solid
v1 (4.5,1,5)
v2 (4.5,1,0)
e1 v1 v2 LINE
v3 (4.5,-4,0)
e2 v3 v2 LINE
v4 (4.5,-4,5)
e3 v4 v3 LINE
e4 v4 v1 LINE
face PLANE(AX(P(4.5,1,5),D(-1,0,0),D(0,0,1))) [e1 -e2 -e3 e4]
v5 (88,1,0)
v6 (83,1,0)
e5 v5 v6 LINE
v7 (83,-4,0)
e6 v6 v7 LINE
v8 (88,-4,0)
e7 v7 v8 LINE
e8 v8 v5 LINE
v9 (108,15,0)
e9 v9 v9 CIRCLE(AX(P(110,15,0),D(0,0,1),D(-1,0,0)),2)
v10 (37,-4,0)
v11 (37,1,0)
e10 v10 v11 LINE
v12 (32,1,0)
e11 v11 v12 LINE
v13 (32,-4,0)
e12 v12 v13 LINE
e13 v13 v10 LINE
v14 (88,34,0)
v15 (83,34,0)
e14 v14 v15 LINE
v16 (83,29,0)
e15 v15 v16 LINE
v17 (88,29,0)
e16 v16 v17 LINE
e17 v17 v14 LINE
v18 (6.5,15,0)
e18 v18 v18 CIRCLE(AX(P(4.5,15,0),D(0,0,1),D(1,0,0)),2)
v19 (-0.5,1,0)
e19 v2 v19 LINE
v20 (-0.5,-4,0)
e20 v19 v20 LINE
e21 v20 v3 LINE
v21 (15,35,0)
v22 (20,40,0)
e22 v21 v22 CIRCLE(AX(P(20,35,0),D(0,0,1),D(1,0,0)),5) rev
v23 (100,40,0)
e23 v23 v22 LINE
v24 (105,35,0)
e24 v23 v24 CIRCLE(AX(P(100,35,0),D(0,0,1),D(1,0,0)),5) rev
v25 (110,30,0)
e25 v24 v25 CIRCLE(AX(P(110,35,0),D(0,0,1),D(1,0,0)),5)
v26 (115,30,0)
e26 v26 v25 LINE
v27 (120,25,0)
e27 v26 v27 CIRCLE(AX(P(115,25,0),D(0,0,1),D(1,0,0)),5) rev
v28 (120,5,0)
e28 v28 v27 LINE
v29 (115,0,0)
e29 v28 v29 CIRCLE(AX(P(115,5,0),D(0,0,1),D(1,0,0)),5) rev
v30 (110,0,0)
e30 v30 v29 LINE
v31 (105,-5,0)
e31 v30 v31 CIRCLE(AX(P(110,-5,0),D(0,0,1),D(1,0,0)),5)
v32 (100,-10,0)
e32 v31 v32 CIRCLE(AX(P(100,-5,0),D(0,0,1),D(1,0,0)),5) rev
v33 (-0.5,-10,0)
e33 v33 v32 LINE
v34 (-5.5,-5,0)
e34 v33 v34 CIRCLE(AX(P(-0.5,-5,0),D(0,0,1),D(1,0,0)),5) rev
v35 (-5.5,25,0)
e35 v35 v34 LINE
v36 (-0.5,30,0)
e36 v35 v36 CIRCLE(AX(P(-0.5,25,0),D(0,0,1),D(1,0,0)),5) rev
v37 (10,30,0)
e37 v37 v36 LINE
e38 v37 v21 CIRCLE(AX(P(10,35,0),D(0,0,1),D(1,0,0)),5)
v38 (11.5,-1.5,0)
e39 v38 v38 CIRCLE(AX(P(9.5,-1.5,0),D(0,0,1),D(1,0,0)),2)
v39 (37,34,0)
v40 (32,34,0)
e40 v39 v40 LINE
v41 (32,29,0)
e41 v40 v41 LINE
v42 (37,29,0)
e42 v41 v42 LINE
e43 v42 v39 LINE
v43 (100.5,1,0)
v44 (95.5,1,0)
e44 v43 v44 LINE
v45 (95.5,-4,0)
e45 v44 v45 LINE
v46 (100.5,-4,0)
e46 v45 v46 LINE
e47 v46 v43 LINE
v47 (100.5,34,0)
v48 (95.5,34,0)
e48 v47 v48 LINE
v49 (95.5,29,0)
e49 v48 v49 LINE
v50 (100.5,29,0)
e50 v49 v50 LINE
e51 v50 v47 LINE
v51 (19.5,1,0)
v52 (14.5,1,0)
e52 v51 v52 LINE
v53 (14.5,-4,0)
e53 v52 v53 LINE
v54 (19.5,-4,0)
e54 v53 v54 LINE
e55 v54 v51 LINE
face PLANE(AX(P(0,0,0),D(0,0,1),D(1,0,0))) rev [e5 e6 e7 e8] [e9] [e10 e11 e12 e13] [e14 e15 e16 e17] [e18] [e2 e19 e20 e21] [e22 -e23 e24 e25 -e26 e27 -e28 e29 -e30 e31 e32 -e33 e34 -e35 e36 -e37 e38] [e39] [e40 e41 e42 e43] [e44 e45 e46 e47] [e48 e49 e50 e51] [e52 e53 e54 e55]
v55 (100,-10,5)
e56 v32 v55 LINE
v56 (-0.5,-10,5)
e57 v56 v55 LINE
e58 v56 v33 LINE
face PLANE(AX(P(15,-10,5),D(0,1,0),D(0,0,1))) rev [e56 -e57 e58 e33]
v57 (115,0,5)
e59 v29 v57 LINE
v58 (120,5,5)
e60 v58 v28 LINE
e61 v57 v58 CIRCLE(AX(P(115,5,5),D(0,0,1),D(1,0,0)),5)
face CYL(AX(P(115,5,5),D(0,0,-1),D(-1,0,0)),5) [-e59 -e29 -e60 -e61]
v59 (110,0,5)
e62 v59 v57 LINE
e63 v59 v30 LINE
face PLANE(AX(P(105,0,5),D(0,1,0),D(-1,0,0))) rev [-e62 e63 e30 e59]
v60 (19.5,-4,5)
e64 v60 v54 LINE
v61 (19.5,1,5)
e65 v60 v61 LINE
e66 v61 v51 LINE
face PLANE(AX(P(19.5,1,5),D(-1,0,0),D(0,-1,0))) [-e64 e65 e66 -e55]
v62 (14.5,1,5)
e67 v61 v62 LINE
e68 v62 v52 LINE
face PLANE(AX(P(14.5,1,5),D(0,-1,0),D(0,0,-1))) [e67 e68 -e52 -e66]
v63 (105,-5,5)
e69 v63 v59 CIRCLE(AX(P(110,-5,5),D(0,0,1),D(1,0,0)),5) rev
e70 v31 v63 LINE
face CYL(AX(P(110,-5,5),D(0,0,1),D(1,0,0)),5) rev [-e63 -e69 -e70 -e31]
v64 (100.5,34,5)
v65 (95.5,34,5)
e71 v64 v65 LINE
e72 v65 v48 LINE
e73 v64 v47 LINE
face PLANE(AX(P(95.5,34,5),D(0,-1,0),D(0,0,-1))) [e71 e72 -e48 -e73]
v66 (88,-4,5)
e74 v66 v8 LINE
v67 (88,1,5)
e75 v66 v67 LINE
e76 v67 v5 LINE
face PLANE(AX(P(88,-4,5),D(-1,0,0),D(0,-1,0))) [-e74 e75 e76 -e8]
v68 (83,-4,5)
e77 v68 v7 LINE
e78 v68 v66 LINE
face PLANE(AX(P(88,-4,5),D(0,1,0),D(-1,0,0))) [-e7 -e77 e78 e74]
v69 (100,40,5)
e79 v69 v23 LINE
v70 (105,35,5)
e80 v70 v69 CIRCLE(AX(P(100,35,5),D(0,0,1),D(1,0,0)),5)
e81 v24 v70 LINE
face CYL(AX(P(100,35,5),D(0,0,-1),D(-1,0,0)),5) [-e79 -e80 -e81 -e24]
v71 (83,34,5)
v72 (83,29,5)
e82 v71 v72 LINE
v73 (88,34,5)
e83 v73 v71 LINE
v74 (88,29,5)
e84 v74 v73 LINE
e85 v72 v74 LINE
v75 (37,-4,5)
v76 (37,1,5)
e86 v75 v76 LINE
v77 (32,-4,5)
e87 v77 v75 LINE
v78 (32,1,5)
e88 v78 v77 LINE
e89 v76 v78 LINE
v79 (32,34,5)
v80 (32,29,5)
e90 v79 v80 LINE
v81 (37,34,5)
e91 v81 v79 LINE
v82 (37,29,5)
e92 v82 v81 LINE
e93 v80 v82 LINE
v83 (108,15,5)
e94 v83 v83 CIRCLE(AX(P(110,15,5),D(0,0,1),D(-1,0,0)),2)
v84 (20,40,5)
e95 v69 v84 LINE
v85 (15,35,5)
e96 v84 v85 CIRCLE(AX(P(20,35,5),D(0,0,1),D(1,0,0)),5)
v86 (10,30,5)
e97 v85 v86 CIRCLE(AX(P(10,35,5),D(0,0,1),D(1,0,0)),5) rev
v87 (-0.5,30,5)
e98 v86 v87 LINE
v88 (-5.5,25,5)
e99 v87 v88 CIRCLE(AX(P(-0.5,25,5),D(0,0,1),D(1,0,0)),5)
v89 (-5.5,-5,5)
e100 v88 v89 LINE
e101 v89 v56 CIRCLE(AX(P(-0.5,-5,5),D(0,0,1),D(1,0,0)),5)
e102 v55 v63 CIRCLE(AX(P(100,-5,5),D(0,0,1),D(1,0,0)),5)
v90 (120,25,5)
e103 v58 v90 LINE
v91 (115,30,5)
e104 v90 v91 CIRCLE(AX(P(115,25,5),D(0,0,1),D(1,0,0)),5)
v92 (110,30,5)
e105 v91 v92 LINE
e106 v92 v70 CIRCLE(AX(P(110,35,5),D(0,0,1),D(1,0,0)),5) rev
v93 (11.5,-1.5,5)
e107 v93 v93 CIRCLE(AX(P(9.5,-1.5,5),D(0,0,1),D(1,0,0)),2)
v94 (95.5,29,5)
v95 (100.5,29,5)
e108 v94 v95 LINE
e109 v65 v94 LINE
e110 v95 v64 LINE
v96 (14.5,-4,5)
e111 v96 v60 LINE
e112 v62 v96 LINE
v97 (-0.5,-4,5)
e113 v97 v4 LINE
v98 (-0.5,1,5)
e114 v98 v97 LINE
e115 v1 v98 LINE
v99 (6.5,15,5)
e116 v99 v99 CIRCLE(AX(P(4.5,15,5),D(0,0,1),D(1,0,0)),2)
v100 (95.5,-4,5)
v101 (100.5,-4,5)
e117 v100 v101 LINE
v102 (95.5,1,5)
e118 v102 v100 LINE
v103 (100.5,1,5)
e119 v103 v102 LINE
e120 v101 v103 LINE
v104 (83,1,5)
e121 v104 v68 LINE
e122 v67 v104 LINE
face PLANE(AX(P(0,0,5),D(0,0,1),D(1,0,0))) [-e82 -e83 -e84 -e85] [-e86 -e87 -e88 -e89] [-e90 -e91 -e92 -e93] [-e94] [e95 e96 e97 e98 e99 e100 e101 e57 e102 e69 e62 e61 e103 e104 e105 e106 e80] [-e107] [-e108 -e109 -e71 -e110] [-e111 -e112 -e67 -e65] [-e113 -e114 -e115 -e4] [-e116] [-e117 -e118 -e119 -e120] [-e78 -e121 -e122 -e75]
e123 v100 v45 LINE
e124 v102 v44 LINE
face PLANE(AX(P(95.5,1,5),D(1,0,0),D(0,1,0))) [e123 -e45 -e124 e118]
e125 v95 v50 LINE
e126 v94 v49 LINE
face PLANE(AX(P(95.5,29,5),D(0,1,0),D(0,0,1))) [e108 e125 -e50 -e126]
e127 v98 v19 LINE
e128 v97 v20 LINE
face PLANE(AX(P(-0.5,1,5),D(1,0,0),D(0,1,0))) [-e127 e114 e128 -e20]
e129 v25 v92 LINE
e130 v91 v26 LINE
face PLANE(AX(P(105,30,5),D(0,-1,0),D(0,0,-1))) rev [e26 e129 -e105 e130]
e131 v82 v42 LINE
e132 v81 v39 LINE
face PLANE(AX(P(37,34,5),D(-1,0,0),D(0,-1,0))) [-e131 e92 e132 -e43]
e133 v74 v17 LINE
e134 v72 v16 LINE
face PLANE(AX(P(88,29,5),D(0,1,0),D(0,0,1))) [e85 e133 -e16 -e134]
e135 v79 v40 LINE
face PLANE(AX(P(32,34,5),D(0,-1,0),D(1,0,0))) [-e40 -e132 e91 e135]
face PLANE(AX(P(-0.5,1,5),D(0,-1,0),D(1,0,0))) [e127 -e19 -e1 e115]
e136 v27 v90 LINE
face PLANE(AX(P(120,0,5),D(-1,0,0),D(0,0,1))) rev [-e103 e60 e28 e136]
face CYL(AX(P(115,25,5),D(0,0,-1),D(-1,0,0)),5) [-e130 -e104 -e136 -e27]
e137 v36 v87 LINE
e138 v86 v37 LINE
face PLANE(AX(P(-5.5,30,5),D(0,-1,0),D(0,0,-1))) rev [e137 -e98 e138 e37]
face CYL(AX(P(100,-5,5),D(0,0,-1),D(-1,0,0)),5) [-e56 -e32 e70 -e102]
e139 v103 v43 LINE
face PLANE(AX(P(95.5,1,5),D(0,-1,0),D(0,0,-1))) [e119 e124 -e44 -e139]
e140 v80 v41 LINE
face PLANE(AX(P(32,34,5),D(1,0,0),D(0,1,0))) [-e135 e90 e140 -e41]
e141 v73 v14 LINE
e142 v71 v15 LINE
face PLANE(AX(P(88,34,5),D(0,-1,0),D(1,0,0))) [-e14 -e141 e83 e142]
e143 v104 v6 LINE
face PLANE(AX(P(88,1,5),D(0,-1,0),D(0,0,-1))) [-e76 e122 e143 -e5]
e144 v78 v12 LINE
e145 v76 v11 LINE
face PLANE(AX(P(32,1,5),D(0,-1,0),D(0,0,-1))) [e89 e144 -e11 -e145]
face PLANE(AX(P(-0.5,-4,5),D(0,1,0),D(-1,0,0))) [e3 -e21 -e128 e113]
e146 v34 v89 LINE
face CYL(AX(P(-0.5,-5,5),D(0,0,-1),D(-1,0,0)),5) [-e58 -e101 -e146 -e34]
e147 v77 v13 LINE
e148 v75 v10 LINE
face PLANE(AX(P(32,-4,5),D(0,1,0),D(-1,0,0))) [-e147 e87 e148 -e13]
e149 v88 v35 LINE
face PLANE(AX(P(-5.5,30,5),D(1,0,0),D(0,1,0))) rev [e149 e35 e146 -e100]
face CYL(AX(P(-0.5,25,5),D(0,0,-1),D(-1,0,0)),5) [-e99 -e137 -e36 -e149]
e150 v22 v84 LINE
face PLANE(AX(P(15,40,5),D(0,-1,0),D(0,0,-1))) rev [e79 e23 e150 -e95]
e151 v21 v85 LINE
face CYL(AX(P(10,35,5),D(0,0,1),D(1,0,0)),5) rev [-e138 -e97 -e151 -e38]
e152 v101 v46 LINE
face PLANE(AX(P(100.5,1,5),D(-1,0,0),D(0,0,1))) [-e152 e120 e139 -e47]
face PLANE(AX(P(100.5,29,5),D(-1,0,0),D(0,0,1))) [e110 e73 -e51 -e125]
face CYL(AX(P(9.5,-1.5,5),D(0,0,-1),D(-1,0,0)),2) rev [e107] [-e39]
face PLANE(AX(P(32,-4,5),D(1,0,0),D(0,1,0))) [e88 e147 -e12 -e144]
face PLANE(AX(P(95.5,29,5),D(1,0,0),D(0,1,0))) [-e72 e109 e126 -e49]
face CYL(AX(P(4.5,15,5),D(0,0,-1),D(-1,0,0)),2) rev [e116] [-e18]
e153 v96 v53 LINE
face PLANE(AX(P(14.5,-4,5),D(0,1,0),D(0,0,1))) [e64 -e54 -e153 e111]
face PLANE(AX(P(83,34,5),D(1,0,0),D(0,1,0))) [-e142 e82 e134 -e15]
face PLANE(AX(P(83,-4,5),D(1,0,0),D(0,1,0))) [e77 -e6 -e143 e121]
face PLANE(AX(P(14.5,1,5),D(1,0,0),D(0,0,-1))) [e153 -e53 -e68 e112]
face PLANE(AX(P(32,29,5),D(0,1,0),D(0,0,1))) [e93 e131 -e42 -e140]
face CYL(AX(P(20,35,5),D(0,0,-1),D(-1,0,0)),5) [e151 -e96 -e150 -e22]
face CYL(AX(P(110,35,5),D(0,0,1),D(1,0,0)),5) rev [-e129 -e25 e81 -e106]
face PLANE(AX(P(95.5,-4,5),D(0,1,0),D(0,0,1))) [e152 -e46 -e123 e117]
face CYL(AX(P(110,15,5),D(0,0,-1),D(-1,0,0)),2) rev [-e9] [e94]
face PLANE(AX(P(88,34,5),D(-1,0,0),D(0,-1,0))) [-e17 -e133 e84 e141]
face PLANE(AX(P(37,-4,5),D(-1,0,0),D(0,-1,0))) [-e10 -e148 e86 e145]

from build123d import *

# Parameters (mm, degrees)
ESQUISSE1_R        = 2
ESQUISSE1_W        = 5
ESQUISSE1_H        = 5
BOSS_EXTRU_1_DEPTH = 5
CONG_1_R           = 5


with BuildPart() as part:
    # Esquisse1 → Boss.-Extru.1 (new body)
    with BuildSketch(Plane.XY):
        Polygon((15, 30), (15, 40), (105, 40), (105, 30), (120, 30), (120, 0), (105, 0), (105, -10), (15, -10), (-5.5, -10), (-5.5, 30), (0, 30), align=None)
        with Locations(Location((110, 15, 0), (0, 0, 180))):
            Circle(ESQUISSE1_R, mode=Mode.SUBTRACT)
        with Locations((4.5, 15)):
            Circle(ESQUISSE1_R, mode=Mode.SUBTRACT)
        with Locations((9.5, -1.5)):
            Circle(ESQUISSE1_R, mode=Mode.SUBTRACT)
        with Locations((85.5, 31.5)):
            Rectangle(ESQUISSE1_W, ESQUISSE1_H, mode=Mode.SUBTRACT)
        with Locations((34.5, 31.5)):
            Rectangle(ESQUISSE1_W, ESQUISSE1_H, mode=Mode.SUBTRACT)
        with Locations((85.5, -1.5)):
            Rectangle(ESQUISSE1_W, ESQUISSE1_H, mode=Mode.SUBTRACT)
        with Locations((34.5, -1.5)):
            Rectangle(ESQUISSE1_W, ESQUISSE1_H, mode=Mode.SUBTRACT)
        with Locations((98, -1.5)):
            Rectangle(ESQUISSE1_W, ESQUISSE1_H, mode=Mode.SUBTRACT)
        with Locations((98, 31.5)):
            Rectangle(ESQUISSE1_W, ESQUISSE1_H, mode=Mode.SUBTRACT)
        with Locations((2, -1.5)):
            Rectangle(ESQUISSE1_W, ESQUISSE1_H, mode=Mode.SUBTRACT)
        with Locations((17, -1.5)):
            Rectangle(ESQUISSE1_W, ESQUISSE1_H, mode=Mode.SUBTRACT)
    extrude(amount=BOSS_EXTRU_1_DEPTH)

    # Congé1
    cong_1_edges = [part.edges().sort_by_distance(p)[0] for p in [
        (105, -10, 2.5),
        (105, 0, 2.5),
        (120, 0, 2.5),
        (120, 30, 2.5),
        (105, 30, 2.5),
        (105, 40, 2.5),
        (15, 40, 2.5),
        (15, 30, 2.5),
        (-5.5, -10, 2.5),
        (-5.5, 30, 2.5),
    ]]
    fillet(cong_1_edges, radius=CONG_1_R - 0.0001)  # a hair under: the kernel refuses the full size


solid = part.part
